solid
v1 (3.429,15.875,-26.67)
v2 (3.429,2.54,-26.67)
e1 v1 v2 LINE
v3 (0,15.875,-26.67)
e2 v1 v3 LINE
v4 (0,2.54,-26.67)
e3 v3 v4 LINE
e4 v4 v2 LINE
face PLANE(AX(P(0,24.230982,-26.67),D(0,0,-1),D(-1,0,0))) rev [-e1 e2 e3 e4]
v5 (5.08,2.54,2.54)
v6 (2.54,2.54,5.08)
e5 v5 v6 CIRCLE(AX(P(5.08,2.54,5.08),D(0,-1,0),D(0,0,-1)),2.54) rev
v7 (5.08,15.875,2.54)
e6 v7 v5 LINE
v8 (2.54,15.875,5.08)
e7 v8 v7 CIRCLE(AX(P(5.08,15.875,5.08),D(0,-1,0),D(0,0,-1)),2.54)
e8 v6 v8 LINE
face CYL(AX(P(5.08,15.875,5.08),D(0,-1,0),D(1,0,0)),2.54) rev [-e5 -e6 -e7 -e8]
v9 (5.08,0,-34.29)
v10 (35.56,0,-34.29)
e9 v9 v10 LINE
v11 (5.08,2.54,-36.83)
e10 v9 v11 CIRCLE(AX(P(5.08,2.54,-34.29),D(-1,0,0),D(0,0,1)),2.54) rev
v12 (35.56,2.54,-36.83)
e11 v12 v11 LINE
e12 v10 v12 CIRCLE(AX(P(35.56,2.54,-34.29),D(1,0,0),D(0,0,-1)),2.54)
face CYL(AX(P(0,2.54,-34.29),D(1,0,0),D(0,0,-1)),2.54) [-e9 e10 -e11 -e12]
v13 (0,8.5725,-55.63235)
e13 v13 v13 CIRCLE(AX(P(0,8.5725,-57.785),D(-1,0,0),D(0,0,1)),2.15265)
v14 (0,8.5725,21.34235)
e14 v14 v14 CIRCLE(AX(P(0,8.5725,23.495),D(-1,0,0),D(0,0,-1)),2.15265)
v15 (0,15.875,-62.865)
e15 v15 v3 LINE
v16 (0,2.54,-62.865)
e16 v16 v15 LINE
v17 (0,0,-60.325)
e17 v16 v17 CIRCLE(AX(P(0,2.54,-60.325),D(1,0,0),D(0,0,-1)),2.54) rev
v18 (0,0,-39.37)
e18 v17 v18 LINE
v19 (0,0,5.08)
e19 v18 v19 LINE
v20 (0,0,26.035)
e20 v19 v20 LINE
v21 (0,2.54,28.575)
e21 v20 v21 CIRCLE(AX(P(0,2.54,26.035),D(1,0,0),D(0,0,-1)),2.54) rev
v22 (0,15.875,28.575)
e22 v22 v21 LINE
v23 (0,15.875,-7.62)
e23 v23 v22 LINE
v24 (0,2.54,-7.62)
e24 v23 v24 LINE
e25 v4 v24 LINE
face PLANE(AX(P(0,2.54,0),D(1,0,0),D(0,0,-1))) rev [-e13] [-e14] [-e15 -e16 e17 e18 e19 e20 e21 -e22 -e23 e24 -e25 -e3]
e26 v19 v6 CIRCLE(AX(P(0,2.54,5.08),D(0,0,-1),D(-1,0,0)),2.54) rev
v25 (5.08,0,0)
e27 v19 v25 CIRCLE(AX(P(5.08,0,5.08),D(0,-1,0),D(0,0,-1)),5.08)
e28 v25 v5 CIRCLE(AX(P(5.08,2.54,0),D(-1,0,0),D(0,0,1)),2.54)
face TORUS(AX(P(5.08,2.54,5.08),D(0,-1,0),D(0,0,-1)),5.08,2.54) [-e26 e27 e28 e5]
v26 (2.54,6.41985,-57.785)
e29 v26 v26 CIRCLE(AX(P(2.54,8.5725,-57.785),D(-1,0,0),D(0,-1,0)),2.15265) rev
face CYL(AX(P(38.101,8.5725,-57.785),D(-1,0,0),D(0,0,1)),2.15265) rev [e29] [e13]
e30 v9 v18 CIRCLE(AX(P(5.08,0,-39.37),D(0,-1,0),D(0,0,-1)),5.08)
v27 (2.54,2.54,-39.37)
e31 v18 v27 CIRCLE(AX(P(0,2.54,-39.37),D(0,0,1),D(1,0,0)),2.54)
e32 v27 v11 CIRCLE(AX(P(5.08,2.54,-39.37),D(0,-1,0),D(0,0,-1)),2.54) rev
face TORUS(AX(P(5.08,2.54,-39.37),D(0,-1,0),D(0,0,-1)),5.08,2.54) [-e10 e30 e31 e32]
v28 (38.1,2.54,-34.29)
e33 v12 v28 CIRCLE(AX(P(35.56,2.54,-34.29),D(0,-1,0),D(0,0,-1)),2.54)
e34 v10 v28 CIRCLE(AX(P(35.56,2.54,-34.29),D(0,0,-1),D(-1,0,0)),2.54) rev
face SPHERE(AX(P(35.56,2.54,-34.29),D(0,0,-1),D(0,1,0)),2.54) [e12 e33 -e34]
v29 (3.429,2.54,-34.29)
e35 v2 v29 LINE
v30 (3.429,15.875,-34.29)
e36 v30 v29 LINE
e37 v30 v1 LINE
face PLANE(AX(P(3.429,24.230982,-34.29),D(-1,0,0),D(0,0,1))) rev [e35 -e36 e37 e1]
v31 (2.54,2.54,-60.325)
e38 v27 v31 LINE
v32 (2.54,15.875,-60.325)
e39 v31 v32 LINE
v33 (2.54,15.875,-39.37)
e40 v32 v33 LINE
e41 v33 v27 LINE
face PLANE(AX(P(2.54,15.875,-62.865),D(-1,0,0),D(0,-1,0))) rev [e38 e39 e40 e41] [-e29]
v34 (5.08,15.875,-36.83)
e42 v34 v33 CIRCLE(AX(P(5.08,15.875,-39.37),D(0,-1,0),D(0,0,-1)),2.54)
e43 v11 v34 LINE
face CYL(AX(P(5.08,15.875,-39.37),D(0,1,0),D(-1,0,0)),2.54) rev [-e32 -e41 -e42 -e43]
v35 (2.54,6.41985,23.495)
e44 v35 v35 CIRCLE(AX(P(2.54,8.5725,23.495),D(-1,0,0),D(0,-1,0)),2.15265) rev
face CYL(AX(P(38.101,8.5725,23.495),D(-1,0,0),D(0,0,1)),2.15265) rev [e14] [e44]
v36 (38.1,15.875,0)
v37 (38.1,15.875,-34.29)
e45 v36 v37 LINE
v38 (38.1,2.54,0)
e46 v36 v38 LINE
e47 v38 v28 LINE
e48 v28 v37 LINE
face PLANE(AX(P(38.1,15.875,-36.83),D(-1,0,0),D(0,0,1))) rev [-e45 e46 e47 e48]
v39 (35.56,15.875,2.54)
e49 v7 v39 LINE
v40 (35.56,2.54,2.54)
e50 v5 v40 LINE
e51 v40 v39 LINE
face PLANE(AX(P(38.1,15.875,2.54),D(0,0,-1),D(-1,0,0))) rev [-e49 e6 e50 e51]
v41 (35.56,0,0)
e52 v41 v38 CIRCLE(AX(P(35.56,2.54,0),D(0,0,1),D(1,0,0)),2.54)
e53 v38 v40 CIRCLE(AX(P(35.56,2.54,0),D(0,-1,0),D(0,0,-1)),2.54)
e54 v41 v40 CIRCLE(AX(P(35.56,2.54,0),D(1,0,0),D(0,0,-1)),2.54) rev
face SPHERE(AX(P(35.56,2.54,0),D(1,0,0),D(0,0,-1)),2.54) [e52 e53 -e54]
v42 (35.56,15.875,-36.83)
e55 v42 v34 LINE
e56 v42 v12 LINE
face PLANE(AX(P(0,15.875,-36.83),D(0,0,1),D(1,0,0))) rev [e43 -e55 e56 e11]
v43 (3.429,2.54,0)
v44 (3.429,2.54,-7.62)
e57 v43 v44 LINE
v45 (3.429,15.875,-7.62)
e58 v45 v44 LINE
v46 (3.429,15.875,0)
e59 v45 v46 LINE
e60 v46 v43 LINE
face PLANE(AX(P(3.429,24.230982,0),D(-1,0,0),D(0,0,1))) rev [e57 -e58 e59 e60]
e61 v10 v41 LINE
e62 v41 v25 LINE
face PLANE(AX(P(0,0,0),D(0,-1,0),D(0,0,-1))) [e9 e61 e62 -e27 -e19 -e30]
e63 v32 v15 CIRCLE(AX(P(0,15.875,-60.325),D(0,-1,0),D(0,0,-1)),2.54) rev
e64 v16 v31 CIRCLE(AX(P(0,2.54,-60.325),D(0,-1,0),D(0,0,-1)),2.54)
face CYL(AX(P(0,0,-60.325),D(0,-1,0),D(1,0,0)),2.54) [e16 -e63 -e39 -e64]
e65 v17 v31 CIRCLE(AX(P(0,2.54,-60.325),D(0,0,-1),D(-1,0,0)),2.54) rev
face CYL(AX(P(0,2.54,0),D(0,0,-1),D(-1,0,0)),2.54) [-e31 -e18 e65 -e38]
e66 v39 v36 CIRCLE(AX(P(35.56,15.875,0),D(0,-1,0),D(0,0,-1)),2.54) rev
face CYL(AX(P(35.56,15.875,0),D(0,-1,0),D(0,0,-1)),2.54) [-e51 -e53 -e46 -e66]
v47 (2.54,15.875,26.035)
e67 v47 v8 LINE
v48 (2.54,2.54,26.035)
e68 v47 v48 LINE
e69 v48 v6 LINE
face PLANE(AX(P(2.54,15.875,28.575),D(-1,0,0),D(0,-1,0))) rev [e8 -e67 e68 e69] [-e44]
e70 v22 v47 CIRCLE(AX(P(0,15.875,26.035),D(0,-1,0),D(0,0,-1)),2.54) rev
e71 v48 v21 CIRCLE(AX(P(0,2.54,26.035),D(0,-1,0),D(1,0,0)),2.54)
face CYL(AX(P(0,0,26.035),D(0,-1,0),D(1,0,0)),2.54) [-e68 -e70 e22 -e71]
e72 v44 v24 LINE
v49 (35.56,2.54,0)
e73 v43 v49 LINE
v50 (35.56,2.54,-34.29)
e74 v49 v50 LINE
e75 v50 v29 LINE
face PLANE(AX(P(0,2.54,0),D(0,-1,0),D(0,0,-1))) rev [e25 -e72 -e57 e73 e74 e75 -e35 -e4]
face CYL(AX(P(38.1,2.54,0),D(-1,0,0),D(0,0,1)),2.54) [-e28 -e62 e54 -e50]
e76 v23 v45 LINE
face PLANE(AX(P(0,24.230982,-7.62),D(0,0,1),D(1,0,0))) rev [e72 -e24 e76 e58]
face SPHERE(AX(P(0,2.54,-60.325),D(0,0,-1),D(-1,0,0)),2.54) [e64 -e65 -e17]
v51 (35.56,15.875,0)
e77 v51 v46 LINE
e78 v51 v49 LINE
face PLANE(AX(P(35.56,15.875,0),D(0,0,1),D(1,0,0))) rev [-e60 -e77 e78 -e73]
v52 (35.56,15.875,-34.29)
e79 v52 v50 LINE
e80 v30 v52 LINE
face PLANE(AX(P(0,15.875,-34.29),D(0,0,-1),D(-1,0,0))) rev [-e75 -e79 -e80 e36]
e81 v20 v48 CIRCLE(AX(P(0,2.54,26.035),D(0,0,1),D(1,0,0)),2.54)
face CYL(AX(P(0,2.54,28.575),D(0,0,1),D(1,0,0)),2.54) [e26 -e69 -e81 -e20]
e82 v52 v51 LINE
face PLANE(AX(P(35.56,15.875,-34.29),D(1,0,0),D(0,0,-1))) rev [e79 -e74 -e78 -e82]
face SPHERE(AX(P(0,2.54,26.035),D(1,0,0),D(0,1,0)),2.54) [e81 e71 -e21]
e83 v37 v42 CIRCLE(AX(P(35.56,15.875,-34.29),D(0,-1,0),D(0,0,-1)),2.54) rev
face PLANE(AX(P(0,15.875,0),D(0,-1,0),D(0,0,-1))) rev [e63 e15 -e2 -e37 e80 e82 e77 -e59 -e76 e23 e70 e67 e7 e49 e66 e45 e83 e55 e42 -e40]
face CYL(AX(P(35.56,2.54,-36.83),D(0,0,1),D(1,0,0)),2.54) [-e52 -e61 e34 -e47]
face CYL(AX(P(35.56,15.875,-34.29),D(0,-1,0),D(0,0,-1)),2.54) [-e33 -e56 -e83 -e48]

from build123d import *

# Parameters (mm, degrees)
SKETCH1_W           = 35.56
SKETCH1_H           = 34.29
BOSS_EXTRUDE1_DEPTH = 2.54
BOSS_EXTRUDE4_DEPTH = 15.875
SKETCH6_W           = 2.54
SKETCH6_H           = 15.875
BOSS_EXTRUDE5_DEPTH = 26.035
SKETCH7_W           = 2.54
SKETCH7_H           = 15.875
BOSS_EXTRUDE6_DEPTH = 26.035
CUT_EXTRUDE1_REACH  = 77.204
SKETCH8_R           = 2.15265
FILLET1_R           = 2.54
SKETCH10_W          = 3.429
SKETCH10_H          = 7.62
BOSS_EXTRUDE7_DEPTH = 13.335


with BuildPart() as part:
    # Sketch1 → Boss-Extrude1 (new body)
    with BuildSketch(Plane(origin=(0, 0, 0), x_dir=(1, 0, 0), z_dir=(0, 1, 0))):
        with Locations((17.78, 17.145)):
            Rectangle(SKETCH1_W, SKETCH1_H)
    extrude(amount=BOSS_EXTRUDE1_DEPTH)

    # Sketch2 → Boss-Extrude4 (add)
    with BuildSketch(Plane(origin=(0, 0, 0), x_dir=(1, 0, 0), z_dir=(0, 1, 0))):
        Polygon((0, 34.29), (0, 36.83), (38.1, 36.83), (38.1, -2.54), (0, -2.54), (0, 0), (35.56, 0), (35.56, 34.29), align=None)
    extrude(amount=BOSS_EXTRUDE4_DEPTH)

    # Sketch6 → Boss-Extrude5 (add)
    with BuildSketch(Plane.XY.offset(2.54)):
        with Locations((1.27, 7.9375)):
            Rectangle(SKETCH6_W, SKETCH6_H)
    extrude(amount=BOSS_EXTRUDE5_DEPTH)

    # Sketch7 → Boss-Extrude6 (add)
    with BuildSketch(Plane(origin=(0, 0, -36.83), x_dir=(-1, 0, 0), z_dir=(0, 0, -1))):
        with Locations((-1.27, 7.9375)):
            Rectangle(SKETCH7_W, SKETCH7_H)
    extrude(amount=BOSS_EXTRUDE6_DEPTH)

    # Sketch8 → Cut-Extrude1 (cut, up to next)
    with BuildSketch(Plane.ZY, mode=Mode.PRIVATE) as cut_extrude1_sk1:
        with Locations((-57.785, 8.5725)):
            Circle(SKETCH8_R)
    cut_extrude1_tool1 = extrude(cut_extrude1_sk1.sketch, amount=-CUT_EXTRUDE1_REACH, mode=Mode.PRIVATE) & part.part
    # Sketch8 → Cut-Extrude1 (cut, up to next)
    with BuildSketch(Plane.ZY, mode=Mode.PRIVATE) as cut_extrude1_sk2:
        with Locations(Location((23.495, 8.5725, 0), (0, 0, 270))):
            Circle(SKETCH8_R)
    cut_extrude1_tool2 = extrude(cut_extrude1_sk2.sketch, amount=-CUT_EXTRUDE1_REACH, mode=Mode.PRIVATE) & part.part
    add(cut_extrude1_tool1.solids().sort_by_distance((0, 8.5725, -57.785))[0], mode=Mode.SUBTRACT)
    add(cut_extrude1_tool2.solids().sort_by_distance((0, 8.5725, 23.495))[0], mode=Mode.SUBTRACT)

    # Fillet1
    # the kernel refuses this fillet: 2.54 mm, written as the material it adds along each edge
    with BuildSketch(Plane(origin=(2.54, 15.875, -36.83), x_dir=(1, 0, 0), z_dir=(0, -1, 0))) as fillet1_piece_1:
        with BuildLine():
            CenterArc((FILLET1_R, -FILLET1_R), FILLET1_R, 90, 90)
            Line((0, -FILLET1_R), (0, 0))
            Line((0, 0), (FILLET1_R, 0))
        make_face()
    extrude(amount=15.875)
    with BuildSketch(Plane(origin=(2.54, 15.875, 2.54), x_dir=(1, 0, 0), z_dir=(0, -1, 0))) as fillet1_piece_2:
        with BuildLine():
            CenterArc((FILLET1_R, FILLET1_R), FILLET1_R, 180, 90)
            Line((0, FILLET1_R), (0, 0))
            Line((0, 0), (FILLET1_R, 0))
        make_face()
    extrude(amount=15.875)
    # the kernel refuses this fillet: 2.54 mm, written as the material it takes off along each edge
    with BuildSketch(Plane(origin=(38.1, -6.35, -36.83), x_dir=(0, 0, 1), z_dir=(0, 1, 0)), Plane(origin=(38.1, -6.35, 2.54), x_dir=(-1, 0, 0), z_dir=(0, 1, 0)), Plane(origin=(2.54, 22.225, -62.865), x_dir=(-1, 0, 0), z_dir=(0, -1, 0))) as fillet1_2_piece_1:
        with BuildLine():
            CenterArc((FILLET1_R, -FILLET1_R), FILLET1_R, 90, 90)
            Line((0, -FILLET1_R), (0, 0))
            Line((0, 0), (FILLET1_R, 0))
        make_face()
    extrude(amount=28.575, mode=Mode.SUBTRACT)
    with BuildSketch(Plane(origin=(2.54, 22.225, 28.575), x_dir=(-1, 0, 0), z_dir=(0, -1, 0))) as fillet1_2_piece_2:
        with BuildLine():
            CenterArc((FILLET1_R, FILLET1_R), FILLET1_R, 180, 90)
            Line((0, FILLET1_R), (0, 0))
            Line((0, 0), (FILLET1_R, 0))
        make_face()
    extrude(amount=28.575, mode=Mode.SUBTRACT)
    with BuildSketch(Plane(origin=(38.1, 0, -43.18), x_dir=(-1, 0, 0), z_dir=(0, 0, 1))) as fillet1_2_piece_3:
        with BuildLine():
            CenterArc((FILLET1_R, -FILLET1_R), FILLET1_R, 90, 90)
            Line((0, -FILLET1_R), (0, 0))
            Line((0, 0), (FILLET1_R, 0))
        make_face()
    extrude(amount=52.07, mode=Mode.SUBTRACT)
    # the kernel refuses this fillet: 2.54 mm, written as the material it takes off along each edge
    with BuildSketch(Plane(origin=(35.56, 2.54, 0), x_dir=(0, 0, 1), z_dir=(0, -1, 0))) as fillet1_3_piece_1_section:
        Polygon((0, 0), (FILLET1_R, 0), (FILLET1_R, -FILLET1_R), (0, -FILLET1_R), align=None)
    fillet1_3_piece_1 = extrude(amount=FILLET1_R, mode=Mode.PRIVATE)
    fillet1_3_piece_1 = fillet1_3_piece_1 - Plane(origin=(35.56, 2.54, 0), x_dir=(-0.7071067811865475, 0, -0.7071067811865475), z_dir=(0, -1, 0)) * Sphere(FILLET1_R, mode=Mode.PRIVATE)
    add(fillet1_3_piece_1, mode=Mode.SUBTRACT)
    with BuildSketch(Plane(origin=(35.56, 2.54, -34.29), x_dir=(0, 0, -1), z_dir=(0, -1, 0))) as fillet1_3_piece_2_section:
        Polygon((0, 0), (FILLET1_R, 0), (FILLET1_R, FILLET1_R), (0, FILLET1_R), align=None)
    fillet1_3_piece_2 = extrude(amount=FILLET1_R, mode=Mode.PRIVATE)
    fillet1_3_piece_2 = fillet1_3_piece_2 - Plane(origin=(35.56, 2.54, -34.29), x_dir=(-0.7071067811865475, 0, 0.7071067811865475), z_dir=(0, -1, 0)) * Sphere(FILLET1_R, mode=Mode.PRIVATE)
    add(fillet1_3_piece_2, mode=Mode.SUBTRACT)
    with BuildSketch(Plane(origin=(2.54, 0, -39.37), x_dir=(-1, 0, 0), z_dir=(0, 0, -1))) as fillet1_3_piece_3:
        with BuildLine():
            CenterArc((FILLET1_R, FILLET1_R), FILLET1_R, 180, 90)
            Line((0, FILLET1_R), (0, 0))
            Line((0, 0), (FILLET1_R, 0))
        make_face()
    extrude(amount=20.955, mode=Mode.SUBTRACT)
    with BuildSketch(Plane(origin=(5.08, 0, -36.83), x_dir=(0, 0, 1), z_dir=(1, 0, 0)), Plane(origin=(35.56, 0, 2.54), x_dir=(0, 0, -1), z_dir=(-1, 0, 0))) as fillet1_3_piece_4:
        with BuildLine():
            CenterArc((FILLET1_R, -FILLET1_R), FILLET1_R, 90, 90)
            Line((0, -FILLET1_R), (0, 0))
            Line((0, 0), (FILLET1_R, 0))
        make_face()
    extrude(amount=30.48, mode=Mode.SUBTRACT)
    with BuildSketch(Plane(origin=(2.54, 0, 5.08), x_dir=(-1, 0, 0), z_dir=(0, 0, 1))) as fillet1_3_piece_5:
        with BuildLine():
            CenterArc((FILLET1_R, -FILLET1_R), FILLET1_R, 90, 90)
            Line((0, -FILLET1_R), (0, 0))
            Line((0, 0), (FILLET1_R, 0))
        make_face()
    extrude(amount=20.955, mode=Mode.SUBTRACT)
    with BuildSketch(Plane(origin=(5.08, 0, 5.08), x_dir=(0, 0, -1), z_dir=(1, 0, 0))) as fillet1_3_piece_6:
        with BuildLine():
            CenterArc((2.54 + FILLET1_R, FILLET1_R), FILLET1_R, 180, 90)
            Line((2.54, FILLET1_R), (2.54, 0))
            Line((2.54, 0), (2.54 + FILLET1_R, 0))
        make_face()
    revolve(axis=Axis((5.08, 0, 5.08), (0, 1, 0)), revolution_arc=90, mode=Mode.SUBTRACT)
    with BuildSketch(Plane(origin=(0, 0, 26.035), x_dir=(-0.5976672776328251, 0, -0.8017442392976499), z_dir=(0.8017442392976499, 0, -0.5976672776328251))) as fillet1_3_piece_7:
        with BuildLine():
            CenterArc((2.54 - FILLET1_R, FILLET1_R), FILLET1_R, 270, 90)
            Line((2.54, FILLET1_R), (2.54, 0))
            Line((2.54, 0), (2.54 - FILLET1_R, 0))
        make_face()
    revolve(axis=Axis((0, 0, 26.035), (0, 1, 0)), revolution_arc=233.296989237, mode=Mode.SUBTRACT)
    with BuildSketch(Plane(origin=(5.08, 0, -39.37), x_dir=(0, 0, 1), z_dir=(1, 0, 0))) as fillet1_3_piece_8:
        with BuildLine():
            CenterArc((2.54 + FILLET1_R, -FILLET1_R), FILLET1_R, 90, 90)
            Line((2.54, -FILLET1_R), (2.54, 0))
            Line((2.54, 0), (2.54 + FILLET1_R, 0))
        make_face()
    revolve(axis=Axis((5.08, 0, -39.37), (0, -1, 0)), revolution_arc=90, mode=Mode.SUBTRACT)
    with BuildSketch(Plane(origin=(0, 0, -60.325), x_dir=(1, 0, 0), z_dir=(0, 0, 1))) as fillet1_3_piece_9:
        with BuildLine():
            CenterArc((2.54 - FILLET1_R, FILLET1_R), FILLET1_R, 270, 90)
            Line((2.54, FILLET1_R), (2.54, 0))
            Line((2.54, 0), (2.54 - FILLET1_R, 0))
        make_face()
    revolve(axis=Axis((0, 0, -60.325), (0, 1, 0)), revolution_arc=233.296989237, mode=Mode.SUBTRACT)

    # Sketch10 → Boss-Extrude7 (add)
    with BuildSketch(Plane(origin=(0, 2.54, 0), x_dir=(1, 0, 0), z_dir=(0, 1, 0))):
        with Locations((1.7145, 30.48)):
            Rectangle(SKETCH10_W, SKETCH10_H)
        with Locations((1.7145, 3.81)):
            Rectangle(SKETCH10_W, SKETCH10_H)
    extrude(amount=BOSS_EXTRUDE7_DEPTH)


solid = part.part
